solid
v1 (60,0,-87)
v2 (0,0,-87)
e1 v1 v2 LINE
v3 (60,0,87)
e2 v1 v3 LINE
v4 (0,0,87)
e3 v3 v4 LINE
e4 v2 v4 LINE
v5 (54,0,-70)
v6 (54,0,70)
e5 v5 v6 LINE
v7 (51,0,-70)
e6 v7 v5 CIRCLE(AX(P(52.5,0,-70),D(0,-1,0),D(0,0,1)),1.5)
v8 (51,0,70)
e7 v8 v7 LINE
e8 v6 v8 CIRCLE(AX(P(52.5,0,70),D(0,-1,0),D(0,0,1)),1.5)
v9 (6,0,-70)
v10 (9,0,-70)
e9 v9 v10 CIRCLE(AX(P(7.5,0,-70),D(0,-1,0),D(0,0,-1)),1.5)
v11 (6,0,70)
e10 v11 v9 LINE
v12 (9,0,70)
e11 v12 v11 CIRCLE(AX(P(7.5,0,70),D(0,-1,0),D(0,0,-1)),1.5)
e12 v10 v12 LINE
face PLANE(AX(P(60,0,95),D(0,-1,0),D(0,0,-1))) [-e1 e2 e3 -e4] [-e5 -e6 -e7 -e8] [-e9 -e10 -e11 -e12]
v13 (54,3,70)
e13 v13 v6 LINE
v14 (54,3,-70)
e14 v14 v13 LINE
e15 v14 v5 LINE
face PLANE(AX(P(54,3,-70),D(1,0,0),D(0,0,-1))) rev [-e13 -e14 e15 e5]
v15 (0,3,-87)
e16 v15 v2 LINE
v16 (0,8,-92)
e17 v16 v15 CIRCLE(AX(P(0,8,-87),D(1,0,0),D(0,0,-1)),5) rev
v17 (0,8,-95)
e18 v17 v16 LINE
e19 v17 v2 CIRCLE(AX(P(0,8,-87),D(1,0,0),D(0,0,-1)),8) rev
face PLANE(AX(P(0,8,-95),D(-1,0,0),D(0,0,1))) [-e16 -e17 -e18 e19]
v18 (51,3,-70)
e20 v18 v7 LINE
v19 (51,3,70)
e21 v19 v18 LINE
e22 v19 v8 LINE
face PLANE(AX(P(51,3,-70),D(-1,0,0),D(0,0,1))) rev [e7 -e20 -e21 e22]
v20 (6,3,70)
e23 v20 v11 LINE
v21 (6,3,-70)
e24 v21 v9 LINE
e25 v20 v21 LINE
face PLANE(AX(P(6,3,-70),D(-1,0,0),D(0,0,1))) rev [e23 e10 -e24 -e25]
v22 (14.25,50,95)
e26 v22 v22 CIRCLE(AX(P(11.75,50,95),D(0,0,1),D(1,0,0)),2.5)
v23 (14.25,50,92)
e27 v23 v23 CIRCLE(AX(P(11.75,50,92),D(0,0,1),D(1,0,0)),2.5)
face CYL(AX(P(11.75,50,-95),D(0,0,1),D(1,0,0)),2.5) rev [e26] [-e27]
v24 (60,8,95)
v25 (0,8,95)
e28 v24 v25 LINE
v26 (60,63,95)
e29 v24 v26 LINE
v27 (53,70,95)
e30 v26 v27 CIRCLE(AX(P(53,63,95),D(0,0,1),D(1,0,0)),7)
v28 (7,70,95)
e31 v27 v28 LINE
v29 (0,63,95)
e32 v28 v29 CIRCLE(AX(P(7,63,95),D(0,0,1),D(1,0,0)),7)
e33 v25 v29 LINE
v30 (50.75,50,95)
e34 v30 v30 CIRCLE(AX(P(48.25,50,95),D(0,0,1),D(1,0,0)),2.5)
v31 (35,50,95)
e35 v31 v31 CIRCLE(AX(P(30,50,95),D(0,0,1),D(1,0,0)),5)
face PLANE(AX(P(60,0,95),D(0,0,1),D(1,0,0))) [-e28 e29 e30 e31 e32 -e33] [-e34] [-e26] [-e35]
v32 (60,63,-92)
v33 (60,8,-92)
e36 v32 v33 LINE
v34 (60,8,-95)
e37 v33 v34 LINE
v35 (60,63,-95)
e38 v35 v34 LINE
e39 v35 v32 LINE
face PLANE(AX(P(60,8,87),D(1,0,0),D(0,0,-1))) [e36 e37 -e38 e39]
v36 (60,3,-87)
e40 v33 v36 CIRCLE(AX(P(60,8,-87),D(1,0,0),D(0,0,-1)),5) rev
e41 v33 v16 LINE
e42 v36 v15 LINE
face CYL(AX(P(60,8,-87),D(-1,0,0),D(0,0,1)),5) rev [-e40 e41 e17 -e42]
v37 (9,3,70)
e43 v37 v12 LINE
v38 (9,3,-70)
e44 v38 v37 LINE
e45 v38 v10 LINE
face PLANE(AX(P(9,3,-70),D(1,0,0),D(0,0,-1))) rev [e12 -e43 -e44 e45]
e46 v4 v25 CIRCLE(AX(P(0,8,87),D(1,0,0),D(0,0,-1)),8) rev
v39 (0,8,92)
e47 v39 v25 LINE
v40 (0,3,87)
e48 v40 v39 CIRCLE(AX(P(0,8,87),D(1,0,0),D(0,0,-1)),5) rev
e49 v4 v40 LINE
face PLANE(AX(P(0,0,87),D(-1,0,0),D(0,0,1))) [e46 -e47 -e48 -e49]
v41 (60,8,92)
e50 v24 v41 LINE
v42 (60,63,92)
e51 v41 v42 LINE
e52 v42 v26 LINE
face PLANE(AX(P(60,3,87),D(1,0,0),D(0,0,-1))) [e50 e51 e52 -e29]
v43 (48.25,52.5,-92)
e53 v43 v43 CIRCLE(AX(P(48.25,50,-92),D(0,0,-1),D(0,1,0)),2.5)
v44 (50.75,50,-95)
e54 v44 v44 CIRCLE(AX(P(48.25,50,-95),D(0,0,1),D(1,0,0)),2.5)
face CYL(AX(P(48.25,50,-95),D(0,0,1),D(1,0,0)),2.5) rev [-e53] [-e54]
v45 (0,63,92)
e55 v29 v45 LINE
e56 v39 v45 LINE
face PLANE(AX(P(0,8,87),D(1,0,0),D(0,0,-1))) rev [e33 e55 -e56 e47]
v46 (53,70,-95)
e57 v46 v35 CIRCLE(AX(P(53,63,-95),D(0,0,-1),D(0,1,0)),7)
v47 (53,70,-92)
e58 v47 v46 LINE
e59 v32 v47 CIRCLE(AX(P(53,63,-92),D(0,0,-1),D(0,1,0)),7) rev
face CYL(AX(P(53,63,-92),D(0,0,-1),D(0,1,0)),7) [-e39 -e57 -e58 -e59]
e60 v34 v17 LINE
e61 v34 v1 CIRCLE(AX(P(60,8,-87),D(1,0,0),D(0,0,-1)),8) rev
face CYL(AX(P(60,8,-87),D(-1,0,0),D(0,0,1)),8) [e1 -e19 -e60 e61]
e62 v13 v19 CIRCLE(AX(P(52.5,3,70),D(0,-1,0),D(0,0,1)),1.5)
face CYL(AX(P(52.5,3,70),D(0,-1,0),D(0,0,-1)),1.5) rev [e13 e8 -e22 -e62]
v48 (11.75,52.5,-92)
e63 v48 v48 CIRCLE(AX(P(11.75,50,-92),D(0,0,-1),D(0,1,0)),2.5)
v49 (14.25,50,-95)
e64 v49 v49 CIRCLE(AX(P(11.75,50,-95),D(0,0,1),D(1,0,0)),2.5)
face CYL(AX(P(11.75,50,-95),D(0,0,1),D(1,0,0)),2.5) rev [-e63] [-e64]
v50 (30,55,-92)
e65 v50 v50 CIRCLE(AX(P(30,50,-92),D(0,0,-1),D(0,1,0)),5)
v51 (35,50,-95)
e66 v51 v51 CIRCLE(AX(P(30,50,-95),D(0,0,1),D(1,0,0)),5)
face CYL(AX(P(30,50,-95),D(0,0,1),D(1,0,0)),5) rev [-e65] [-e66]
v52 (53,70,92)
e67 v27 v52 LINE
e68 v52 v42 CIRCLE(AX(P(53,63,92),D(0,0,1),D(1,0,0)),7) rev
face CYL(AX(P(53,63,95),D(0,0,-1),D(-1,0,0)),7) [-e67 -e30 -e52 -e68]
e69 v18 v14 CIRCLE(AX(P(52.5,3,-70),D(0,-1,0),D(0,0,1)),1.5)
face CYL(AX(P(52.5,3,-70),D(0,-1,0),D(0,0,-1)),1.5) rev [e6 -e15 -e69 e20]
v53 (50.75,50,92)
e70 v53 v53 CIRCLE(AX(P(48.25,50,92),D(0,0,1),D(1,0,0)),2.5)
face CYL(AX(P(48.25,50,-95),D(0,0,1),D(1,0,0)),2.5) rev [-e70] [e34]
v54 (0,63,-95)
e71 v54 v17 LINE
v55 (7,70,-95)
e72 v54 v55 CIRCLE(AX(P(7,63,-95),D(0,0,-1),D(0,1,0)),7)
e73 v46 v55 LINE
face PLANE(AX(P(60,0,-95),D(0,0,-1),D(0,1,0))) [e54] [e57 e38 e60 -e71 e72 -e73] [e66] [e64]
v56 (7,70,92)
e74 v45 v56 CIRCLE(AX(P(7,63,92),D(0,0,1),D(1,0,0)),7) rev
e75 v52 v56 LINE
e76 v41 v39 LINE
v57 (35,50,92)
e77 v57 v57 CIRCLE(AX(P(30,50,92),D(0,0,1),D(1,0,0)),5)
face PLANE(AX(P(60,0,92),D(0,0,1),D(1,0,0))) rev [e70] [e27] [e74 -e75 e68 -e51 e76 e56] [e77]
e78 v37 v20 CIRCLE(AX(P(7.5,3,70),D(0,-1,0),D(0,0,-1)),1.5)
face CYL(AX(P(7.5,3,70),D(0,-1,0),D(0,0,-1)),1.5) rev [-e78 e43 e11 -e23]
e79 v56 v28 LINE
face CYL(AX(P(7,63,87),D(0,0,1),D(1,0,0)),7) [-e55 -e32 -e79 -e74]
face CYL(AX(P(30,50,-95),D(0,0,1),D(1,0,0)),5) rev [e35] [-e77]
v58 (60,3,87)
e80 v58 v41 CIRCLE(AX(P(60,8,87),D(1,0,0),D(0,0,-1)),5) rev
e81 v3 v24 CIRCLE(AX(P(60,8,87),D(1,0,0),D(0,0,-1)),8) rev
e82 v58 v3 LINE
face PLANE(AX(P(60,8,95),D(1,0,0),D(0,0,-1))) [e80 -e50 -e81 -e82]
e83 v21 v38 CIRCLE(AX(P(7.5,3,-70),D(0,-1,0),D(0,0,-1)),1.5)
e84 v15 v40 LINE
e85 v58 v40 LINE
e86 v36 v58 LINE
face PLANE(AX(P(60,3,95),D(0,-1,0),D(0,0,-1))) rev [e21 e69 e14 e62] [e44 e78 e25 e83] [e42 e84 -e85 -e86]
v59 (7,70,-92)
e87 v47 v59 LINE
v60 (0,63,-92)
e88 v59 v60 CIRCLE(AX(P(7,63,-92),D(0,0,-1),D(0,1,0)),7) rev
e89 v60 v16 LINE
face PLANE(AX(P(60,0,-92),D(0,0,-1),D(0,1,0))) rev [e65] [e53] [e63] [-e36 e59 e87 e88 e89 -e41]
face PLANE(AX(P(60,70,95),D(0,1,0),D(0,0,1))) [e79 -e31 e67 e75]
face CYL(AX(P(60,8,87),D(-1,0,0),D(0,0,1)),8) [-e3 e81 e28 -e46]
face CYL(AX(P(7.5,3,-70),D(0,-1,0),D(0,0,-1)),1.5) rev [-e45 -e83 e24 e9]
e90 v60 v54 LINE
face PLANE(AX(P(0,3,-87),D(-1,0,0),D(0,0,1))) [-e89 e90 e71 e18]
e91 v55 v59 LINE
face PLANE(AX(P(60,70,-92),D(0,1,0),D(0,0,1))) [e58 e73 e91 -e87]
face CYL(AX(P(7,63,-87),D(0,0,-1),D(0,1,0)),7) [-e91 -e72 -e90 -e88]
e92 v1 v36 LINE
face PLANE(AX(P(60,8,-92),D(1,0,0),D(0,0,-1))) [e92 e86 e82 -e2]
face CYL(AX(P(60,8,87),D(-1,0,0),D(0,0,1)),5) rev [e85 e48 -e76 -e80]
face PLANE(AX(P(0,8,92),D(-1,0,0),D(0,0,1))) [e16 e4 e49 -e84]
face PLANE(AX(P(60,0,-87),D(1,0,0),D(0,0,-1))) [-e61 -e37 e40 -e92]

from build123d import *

# Parameters (mm, degrees)
BASE_FLANGE1_DEPTH = 60
SKETCH6_R          = 5
SKETCH6_R_2        = 2.5
CUT_EXTRUDE1_DEPTH = 212.187120819
CUT_EXTRUDE2_DEPTH = 10
FILLET1_R          = 7


# Sheet-metal steps are written as plain solids
with BuildPart() as part:
    # Sketch1 → Base-Flange1 (new body)
    with BuildSketch(Plane(origin=(0, 0, 0), x_dir=(0, 0, -1), z_dir=(1, 0, 0))):
        with BuildLine():
            Line((-95, 70), (-95, 8))
            ThreePointArc((-95, 8), (-92.656854249, 2.343145751), (-87, 0))
            Line((-87, 0), (87, 0))
            ThreePointArc((87, 0), (92.656854249, 2.343145751), (95, 8))
            Line((95, 8), (95, 70))
            Line((95, 70), (92, 70))
            Line((92, 70), (92, 8))
            ThreePointArc((92, 8), (90.535533906, 4.464466094), (87, 3))
            Line((87, 3), (-87, 3))
            ThreePointArc((-87, 3), (-90.535533906, 4.464466094), (-92, 8))
            Line((-92, 8), (-92, 70))
            Line((-92, 70), (-95, 70))
        make_face()
    extrude(amount=BASE_FLANGE1_DEPTH)

    # Sketch6 → Cut-Extrude1 (cut, through all)
    with BuildSketch(Plane.XY.offset(95)):
        with Locations((30, 50)):
            Circle(SKETCH6_R)
        with Locations((11.75, 50)):
            Circle(SKETCH6_R_2)
        with Locations((48.25, 50)):
            Circle(SKETCH6_R_2)
    extrude(amount=-CUT_EXTRUDE1_DEPTH, mode=Mode.SUBTRACT)

    # Sketch7 → Cut-Extrude2 (cut)
    with BuildSketch(Plane(origin=(0, 0, 0), x_dir=(-1, 0, 0), z_dir=(0, -1, 0))):
        with BuildLine():
            Line((-6, 70), (-6, -70))
            ThreePointArc((-6, -70), (-7.5, -71.5), (-9, -70))
            Line((-9, -70), (-9, 70))
            ThreePointArc((-9, 70), (-7.5, 71.5), (-6, 70))
        make_face()
        with BuildLine():
            Line((-54, 70), (-54, -70))
            ThreePointArc((-54, -70), (-52.5, -71.5), (-51, -70))
            Line((-51, -70), (-51, 70))
            ThreePointArc((-51, 70), (-52.5, 71.5), (-54, 70))
        make_face()
    extrude(amount=-CUT_EXTRUDE2_DEPTH, mode=Mode.SUBTRACT)

    # Fillet1
    fillet1_edges = [part.edges().sort_by_distance(p)[0] for p in [
        (0, 70, -93.5),
        (0, 70, 93.5),
        (60, 70, -93.5),
        (60, 70, 93.5),
    ]]
    fillet(fillet1_edges, radius=FILLET1_R)


solid = part.part
